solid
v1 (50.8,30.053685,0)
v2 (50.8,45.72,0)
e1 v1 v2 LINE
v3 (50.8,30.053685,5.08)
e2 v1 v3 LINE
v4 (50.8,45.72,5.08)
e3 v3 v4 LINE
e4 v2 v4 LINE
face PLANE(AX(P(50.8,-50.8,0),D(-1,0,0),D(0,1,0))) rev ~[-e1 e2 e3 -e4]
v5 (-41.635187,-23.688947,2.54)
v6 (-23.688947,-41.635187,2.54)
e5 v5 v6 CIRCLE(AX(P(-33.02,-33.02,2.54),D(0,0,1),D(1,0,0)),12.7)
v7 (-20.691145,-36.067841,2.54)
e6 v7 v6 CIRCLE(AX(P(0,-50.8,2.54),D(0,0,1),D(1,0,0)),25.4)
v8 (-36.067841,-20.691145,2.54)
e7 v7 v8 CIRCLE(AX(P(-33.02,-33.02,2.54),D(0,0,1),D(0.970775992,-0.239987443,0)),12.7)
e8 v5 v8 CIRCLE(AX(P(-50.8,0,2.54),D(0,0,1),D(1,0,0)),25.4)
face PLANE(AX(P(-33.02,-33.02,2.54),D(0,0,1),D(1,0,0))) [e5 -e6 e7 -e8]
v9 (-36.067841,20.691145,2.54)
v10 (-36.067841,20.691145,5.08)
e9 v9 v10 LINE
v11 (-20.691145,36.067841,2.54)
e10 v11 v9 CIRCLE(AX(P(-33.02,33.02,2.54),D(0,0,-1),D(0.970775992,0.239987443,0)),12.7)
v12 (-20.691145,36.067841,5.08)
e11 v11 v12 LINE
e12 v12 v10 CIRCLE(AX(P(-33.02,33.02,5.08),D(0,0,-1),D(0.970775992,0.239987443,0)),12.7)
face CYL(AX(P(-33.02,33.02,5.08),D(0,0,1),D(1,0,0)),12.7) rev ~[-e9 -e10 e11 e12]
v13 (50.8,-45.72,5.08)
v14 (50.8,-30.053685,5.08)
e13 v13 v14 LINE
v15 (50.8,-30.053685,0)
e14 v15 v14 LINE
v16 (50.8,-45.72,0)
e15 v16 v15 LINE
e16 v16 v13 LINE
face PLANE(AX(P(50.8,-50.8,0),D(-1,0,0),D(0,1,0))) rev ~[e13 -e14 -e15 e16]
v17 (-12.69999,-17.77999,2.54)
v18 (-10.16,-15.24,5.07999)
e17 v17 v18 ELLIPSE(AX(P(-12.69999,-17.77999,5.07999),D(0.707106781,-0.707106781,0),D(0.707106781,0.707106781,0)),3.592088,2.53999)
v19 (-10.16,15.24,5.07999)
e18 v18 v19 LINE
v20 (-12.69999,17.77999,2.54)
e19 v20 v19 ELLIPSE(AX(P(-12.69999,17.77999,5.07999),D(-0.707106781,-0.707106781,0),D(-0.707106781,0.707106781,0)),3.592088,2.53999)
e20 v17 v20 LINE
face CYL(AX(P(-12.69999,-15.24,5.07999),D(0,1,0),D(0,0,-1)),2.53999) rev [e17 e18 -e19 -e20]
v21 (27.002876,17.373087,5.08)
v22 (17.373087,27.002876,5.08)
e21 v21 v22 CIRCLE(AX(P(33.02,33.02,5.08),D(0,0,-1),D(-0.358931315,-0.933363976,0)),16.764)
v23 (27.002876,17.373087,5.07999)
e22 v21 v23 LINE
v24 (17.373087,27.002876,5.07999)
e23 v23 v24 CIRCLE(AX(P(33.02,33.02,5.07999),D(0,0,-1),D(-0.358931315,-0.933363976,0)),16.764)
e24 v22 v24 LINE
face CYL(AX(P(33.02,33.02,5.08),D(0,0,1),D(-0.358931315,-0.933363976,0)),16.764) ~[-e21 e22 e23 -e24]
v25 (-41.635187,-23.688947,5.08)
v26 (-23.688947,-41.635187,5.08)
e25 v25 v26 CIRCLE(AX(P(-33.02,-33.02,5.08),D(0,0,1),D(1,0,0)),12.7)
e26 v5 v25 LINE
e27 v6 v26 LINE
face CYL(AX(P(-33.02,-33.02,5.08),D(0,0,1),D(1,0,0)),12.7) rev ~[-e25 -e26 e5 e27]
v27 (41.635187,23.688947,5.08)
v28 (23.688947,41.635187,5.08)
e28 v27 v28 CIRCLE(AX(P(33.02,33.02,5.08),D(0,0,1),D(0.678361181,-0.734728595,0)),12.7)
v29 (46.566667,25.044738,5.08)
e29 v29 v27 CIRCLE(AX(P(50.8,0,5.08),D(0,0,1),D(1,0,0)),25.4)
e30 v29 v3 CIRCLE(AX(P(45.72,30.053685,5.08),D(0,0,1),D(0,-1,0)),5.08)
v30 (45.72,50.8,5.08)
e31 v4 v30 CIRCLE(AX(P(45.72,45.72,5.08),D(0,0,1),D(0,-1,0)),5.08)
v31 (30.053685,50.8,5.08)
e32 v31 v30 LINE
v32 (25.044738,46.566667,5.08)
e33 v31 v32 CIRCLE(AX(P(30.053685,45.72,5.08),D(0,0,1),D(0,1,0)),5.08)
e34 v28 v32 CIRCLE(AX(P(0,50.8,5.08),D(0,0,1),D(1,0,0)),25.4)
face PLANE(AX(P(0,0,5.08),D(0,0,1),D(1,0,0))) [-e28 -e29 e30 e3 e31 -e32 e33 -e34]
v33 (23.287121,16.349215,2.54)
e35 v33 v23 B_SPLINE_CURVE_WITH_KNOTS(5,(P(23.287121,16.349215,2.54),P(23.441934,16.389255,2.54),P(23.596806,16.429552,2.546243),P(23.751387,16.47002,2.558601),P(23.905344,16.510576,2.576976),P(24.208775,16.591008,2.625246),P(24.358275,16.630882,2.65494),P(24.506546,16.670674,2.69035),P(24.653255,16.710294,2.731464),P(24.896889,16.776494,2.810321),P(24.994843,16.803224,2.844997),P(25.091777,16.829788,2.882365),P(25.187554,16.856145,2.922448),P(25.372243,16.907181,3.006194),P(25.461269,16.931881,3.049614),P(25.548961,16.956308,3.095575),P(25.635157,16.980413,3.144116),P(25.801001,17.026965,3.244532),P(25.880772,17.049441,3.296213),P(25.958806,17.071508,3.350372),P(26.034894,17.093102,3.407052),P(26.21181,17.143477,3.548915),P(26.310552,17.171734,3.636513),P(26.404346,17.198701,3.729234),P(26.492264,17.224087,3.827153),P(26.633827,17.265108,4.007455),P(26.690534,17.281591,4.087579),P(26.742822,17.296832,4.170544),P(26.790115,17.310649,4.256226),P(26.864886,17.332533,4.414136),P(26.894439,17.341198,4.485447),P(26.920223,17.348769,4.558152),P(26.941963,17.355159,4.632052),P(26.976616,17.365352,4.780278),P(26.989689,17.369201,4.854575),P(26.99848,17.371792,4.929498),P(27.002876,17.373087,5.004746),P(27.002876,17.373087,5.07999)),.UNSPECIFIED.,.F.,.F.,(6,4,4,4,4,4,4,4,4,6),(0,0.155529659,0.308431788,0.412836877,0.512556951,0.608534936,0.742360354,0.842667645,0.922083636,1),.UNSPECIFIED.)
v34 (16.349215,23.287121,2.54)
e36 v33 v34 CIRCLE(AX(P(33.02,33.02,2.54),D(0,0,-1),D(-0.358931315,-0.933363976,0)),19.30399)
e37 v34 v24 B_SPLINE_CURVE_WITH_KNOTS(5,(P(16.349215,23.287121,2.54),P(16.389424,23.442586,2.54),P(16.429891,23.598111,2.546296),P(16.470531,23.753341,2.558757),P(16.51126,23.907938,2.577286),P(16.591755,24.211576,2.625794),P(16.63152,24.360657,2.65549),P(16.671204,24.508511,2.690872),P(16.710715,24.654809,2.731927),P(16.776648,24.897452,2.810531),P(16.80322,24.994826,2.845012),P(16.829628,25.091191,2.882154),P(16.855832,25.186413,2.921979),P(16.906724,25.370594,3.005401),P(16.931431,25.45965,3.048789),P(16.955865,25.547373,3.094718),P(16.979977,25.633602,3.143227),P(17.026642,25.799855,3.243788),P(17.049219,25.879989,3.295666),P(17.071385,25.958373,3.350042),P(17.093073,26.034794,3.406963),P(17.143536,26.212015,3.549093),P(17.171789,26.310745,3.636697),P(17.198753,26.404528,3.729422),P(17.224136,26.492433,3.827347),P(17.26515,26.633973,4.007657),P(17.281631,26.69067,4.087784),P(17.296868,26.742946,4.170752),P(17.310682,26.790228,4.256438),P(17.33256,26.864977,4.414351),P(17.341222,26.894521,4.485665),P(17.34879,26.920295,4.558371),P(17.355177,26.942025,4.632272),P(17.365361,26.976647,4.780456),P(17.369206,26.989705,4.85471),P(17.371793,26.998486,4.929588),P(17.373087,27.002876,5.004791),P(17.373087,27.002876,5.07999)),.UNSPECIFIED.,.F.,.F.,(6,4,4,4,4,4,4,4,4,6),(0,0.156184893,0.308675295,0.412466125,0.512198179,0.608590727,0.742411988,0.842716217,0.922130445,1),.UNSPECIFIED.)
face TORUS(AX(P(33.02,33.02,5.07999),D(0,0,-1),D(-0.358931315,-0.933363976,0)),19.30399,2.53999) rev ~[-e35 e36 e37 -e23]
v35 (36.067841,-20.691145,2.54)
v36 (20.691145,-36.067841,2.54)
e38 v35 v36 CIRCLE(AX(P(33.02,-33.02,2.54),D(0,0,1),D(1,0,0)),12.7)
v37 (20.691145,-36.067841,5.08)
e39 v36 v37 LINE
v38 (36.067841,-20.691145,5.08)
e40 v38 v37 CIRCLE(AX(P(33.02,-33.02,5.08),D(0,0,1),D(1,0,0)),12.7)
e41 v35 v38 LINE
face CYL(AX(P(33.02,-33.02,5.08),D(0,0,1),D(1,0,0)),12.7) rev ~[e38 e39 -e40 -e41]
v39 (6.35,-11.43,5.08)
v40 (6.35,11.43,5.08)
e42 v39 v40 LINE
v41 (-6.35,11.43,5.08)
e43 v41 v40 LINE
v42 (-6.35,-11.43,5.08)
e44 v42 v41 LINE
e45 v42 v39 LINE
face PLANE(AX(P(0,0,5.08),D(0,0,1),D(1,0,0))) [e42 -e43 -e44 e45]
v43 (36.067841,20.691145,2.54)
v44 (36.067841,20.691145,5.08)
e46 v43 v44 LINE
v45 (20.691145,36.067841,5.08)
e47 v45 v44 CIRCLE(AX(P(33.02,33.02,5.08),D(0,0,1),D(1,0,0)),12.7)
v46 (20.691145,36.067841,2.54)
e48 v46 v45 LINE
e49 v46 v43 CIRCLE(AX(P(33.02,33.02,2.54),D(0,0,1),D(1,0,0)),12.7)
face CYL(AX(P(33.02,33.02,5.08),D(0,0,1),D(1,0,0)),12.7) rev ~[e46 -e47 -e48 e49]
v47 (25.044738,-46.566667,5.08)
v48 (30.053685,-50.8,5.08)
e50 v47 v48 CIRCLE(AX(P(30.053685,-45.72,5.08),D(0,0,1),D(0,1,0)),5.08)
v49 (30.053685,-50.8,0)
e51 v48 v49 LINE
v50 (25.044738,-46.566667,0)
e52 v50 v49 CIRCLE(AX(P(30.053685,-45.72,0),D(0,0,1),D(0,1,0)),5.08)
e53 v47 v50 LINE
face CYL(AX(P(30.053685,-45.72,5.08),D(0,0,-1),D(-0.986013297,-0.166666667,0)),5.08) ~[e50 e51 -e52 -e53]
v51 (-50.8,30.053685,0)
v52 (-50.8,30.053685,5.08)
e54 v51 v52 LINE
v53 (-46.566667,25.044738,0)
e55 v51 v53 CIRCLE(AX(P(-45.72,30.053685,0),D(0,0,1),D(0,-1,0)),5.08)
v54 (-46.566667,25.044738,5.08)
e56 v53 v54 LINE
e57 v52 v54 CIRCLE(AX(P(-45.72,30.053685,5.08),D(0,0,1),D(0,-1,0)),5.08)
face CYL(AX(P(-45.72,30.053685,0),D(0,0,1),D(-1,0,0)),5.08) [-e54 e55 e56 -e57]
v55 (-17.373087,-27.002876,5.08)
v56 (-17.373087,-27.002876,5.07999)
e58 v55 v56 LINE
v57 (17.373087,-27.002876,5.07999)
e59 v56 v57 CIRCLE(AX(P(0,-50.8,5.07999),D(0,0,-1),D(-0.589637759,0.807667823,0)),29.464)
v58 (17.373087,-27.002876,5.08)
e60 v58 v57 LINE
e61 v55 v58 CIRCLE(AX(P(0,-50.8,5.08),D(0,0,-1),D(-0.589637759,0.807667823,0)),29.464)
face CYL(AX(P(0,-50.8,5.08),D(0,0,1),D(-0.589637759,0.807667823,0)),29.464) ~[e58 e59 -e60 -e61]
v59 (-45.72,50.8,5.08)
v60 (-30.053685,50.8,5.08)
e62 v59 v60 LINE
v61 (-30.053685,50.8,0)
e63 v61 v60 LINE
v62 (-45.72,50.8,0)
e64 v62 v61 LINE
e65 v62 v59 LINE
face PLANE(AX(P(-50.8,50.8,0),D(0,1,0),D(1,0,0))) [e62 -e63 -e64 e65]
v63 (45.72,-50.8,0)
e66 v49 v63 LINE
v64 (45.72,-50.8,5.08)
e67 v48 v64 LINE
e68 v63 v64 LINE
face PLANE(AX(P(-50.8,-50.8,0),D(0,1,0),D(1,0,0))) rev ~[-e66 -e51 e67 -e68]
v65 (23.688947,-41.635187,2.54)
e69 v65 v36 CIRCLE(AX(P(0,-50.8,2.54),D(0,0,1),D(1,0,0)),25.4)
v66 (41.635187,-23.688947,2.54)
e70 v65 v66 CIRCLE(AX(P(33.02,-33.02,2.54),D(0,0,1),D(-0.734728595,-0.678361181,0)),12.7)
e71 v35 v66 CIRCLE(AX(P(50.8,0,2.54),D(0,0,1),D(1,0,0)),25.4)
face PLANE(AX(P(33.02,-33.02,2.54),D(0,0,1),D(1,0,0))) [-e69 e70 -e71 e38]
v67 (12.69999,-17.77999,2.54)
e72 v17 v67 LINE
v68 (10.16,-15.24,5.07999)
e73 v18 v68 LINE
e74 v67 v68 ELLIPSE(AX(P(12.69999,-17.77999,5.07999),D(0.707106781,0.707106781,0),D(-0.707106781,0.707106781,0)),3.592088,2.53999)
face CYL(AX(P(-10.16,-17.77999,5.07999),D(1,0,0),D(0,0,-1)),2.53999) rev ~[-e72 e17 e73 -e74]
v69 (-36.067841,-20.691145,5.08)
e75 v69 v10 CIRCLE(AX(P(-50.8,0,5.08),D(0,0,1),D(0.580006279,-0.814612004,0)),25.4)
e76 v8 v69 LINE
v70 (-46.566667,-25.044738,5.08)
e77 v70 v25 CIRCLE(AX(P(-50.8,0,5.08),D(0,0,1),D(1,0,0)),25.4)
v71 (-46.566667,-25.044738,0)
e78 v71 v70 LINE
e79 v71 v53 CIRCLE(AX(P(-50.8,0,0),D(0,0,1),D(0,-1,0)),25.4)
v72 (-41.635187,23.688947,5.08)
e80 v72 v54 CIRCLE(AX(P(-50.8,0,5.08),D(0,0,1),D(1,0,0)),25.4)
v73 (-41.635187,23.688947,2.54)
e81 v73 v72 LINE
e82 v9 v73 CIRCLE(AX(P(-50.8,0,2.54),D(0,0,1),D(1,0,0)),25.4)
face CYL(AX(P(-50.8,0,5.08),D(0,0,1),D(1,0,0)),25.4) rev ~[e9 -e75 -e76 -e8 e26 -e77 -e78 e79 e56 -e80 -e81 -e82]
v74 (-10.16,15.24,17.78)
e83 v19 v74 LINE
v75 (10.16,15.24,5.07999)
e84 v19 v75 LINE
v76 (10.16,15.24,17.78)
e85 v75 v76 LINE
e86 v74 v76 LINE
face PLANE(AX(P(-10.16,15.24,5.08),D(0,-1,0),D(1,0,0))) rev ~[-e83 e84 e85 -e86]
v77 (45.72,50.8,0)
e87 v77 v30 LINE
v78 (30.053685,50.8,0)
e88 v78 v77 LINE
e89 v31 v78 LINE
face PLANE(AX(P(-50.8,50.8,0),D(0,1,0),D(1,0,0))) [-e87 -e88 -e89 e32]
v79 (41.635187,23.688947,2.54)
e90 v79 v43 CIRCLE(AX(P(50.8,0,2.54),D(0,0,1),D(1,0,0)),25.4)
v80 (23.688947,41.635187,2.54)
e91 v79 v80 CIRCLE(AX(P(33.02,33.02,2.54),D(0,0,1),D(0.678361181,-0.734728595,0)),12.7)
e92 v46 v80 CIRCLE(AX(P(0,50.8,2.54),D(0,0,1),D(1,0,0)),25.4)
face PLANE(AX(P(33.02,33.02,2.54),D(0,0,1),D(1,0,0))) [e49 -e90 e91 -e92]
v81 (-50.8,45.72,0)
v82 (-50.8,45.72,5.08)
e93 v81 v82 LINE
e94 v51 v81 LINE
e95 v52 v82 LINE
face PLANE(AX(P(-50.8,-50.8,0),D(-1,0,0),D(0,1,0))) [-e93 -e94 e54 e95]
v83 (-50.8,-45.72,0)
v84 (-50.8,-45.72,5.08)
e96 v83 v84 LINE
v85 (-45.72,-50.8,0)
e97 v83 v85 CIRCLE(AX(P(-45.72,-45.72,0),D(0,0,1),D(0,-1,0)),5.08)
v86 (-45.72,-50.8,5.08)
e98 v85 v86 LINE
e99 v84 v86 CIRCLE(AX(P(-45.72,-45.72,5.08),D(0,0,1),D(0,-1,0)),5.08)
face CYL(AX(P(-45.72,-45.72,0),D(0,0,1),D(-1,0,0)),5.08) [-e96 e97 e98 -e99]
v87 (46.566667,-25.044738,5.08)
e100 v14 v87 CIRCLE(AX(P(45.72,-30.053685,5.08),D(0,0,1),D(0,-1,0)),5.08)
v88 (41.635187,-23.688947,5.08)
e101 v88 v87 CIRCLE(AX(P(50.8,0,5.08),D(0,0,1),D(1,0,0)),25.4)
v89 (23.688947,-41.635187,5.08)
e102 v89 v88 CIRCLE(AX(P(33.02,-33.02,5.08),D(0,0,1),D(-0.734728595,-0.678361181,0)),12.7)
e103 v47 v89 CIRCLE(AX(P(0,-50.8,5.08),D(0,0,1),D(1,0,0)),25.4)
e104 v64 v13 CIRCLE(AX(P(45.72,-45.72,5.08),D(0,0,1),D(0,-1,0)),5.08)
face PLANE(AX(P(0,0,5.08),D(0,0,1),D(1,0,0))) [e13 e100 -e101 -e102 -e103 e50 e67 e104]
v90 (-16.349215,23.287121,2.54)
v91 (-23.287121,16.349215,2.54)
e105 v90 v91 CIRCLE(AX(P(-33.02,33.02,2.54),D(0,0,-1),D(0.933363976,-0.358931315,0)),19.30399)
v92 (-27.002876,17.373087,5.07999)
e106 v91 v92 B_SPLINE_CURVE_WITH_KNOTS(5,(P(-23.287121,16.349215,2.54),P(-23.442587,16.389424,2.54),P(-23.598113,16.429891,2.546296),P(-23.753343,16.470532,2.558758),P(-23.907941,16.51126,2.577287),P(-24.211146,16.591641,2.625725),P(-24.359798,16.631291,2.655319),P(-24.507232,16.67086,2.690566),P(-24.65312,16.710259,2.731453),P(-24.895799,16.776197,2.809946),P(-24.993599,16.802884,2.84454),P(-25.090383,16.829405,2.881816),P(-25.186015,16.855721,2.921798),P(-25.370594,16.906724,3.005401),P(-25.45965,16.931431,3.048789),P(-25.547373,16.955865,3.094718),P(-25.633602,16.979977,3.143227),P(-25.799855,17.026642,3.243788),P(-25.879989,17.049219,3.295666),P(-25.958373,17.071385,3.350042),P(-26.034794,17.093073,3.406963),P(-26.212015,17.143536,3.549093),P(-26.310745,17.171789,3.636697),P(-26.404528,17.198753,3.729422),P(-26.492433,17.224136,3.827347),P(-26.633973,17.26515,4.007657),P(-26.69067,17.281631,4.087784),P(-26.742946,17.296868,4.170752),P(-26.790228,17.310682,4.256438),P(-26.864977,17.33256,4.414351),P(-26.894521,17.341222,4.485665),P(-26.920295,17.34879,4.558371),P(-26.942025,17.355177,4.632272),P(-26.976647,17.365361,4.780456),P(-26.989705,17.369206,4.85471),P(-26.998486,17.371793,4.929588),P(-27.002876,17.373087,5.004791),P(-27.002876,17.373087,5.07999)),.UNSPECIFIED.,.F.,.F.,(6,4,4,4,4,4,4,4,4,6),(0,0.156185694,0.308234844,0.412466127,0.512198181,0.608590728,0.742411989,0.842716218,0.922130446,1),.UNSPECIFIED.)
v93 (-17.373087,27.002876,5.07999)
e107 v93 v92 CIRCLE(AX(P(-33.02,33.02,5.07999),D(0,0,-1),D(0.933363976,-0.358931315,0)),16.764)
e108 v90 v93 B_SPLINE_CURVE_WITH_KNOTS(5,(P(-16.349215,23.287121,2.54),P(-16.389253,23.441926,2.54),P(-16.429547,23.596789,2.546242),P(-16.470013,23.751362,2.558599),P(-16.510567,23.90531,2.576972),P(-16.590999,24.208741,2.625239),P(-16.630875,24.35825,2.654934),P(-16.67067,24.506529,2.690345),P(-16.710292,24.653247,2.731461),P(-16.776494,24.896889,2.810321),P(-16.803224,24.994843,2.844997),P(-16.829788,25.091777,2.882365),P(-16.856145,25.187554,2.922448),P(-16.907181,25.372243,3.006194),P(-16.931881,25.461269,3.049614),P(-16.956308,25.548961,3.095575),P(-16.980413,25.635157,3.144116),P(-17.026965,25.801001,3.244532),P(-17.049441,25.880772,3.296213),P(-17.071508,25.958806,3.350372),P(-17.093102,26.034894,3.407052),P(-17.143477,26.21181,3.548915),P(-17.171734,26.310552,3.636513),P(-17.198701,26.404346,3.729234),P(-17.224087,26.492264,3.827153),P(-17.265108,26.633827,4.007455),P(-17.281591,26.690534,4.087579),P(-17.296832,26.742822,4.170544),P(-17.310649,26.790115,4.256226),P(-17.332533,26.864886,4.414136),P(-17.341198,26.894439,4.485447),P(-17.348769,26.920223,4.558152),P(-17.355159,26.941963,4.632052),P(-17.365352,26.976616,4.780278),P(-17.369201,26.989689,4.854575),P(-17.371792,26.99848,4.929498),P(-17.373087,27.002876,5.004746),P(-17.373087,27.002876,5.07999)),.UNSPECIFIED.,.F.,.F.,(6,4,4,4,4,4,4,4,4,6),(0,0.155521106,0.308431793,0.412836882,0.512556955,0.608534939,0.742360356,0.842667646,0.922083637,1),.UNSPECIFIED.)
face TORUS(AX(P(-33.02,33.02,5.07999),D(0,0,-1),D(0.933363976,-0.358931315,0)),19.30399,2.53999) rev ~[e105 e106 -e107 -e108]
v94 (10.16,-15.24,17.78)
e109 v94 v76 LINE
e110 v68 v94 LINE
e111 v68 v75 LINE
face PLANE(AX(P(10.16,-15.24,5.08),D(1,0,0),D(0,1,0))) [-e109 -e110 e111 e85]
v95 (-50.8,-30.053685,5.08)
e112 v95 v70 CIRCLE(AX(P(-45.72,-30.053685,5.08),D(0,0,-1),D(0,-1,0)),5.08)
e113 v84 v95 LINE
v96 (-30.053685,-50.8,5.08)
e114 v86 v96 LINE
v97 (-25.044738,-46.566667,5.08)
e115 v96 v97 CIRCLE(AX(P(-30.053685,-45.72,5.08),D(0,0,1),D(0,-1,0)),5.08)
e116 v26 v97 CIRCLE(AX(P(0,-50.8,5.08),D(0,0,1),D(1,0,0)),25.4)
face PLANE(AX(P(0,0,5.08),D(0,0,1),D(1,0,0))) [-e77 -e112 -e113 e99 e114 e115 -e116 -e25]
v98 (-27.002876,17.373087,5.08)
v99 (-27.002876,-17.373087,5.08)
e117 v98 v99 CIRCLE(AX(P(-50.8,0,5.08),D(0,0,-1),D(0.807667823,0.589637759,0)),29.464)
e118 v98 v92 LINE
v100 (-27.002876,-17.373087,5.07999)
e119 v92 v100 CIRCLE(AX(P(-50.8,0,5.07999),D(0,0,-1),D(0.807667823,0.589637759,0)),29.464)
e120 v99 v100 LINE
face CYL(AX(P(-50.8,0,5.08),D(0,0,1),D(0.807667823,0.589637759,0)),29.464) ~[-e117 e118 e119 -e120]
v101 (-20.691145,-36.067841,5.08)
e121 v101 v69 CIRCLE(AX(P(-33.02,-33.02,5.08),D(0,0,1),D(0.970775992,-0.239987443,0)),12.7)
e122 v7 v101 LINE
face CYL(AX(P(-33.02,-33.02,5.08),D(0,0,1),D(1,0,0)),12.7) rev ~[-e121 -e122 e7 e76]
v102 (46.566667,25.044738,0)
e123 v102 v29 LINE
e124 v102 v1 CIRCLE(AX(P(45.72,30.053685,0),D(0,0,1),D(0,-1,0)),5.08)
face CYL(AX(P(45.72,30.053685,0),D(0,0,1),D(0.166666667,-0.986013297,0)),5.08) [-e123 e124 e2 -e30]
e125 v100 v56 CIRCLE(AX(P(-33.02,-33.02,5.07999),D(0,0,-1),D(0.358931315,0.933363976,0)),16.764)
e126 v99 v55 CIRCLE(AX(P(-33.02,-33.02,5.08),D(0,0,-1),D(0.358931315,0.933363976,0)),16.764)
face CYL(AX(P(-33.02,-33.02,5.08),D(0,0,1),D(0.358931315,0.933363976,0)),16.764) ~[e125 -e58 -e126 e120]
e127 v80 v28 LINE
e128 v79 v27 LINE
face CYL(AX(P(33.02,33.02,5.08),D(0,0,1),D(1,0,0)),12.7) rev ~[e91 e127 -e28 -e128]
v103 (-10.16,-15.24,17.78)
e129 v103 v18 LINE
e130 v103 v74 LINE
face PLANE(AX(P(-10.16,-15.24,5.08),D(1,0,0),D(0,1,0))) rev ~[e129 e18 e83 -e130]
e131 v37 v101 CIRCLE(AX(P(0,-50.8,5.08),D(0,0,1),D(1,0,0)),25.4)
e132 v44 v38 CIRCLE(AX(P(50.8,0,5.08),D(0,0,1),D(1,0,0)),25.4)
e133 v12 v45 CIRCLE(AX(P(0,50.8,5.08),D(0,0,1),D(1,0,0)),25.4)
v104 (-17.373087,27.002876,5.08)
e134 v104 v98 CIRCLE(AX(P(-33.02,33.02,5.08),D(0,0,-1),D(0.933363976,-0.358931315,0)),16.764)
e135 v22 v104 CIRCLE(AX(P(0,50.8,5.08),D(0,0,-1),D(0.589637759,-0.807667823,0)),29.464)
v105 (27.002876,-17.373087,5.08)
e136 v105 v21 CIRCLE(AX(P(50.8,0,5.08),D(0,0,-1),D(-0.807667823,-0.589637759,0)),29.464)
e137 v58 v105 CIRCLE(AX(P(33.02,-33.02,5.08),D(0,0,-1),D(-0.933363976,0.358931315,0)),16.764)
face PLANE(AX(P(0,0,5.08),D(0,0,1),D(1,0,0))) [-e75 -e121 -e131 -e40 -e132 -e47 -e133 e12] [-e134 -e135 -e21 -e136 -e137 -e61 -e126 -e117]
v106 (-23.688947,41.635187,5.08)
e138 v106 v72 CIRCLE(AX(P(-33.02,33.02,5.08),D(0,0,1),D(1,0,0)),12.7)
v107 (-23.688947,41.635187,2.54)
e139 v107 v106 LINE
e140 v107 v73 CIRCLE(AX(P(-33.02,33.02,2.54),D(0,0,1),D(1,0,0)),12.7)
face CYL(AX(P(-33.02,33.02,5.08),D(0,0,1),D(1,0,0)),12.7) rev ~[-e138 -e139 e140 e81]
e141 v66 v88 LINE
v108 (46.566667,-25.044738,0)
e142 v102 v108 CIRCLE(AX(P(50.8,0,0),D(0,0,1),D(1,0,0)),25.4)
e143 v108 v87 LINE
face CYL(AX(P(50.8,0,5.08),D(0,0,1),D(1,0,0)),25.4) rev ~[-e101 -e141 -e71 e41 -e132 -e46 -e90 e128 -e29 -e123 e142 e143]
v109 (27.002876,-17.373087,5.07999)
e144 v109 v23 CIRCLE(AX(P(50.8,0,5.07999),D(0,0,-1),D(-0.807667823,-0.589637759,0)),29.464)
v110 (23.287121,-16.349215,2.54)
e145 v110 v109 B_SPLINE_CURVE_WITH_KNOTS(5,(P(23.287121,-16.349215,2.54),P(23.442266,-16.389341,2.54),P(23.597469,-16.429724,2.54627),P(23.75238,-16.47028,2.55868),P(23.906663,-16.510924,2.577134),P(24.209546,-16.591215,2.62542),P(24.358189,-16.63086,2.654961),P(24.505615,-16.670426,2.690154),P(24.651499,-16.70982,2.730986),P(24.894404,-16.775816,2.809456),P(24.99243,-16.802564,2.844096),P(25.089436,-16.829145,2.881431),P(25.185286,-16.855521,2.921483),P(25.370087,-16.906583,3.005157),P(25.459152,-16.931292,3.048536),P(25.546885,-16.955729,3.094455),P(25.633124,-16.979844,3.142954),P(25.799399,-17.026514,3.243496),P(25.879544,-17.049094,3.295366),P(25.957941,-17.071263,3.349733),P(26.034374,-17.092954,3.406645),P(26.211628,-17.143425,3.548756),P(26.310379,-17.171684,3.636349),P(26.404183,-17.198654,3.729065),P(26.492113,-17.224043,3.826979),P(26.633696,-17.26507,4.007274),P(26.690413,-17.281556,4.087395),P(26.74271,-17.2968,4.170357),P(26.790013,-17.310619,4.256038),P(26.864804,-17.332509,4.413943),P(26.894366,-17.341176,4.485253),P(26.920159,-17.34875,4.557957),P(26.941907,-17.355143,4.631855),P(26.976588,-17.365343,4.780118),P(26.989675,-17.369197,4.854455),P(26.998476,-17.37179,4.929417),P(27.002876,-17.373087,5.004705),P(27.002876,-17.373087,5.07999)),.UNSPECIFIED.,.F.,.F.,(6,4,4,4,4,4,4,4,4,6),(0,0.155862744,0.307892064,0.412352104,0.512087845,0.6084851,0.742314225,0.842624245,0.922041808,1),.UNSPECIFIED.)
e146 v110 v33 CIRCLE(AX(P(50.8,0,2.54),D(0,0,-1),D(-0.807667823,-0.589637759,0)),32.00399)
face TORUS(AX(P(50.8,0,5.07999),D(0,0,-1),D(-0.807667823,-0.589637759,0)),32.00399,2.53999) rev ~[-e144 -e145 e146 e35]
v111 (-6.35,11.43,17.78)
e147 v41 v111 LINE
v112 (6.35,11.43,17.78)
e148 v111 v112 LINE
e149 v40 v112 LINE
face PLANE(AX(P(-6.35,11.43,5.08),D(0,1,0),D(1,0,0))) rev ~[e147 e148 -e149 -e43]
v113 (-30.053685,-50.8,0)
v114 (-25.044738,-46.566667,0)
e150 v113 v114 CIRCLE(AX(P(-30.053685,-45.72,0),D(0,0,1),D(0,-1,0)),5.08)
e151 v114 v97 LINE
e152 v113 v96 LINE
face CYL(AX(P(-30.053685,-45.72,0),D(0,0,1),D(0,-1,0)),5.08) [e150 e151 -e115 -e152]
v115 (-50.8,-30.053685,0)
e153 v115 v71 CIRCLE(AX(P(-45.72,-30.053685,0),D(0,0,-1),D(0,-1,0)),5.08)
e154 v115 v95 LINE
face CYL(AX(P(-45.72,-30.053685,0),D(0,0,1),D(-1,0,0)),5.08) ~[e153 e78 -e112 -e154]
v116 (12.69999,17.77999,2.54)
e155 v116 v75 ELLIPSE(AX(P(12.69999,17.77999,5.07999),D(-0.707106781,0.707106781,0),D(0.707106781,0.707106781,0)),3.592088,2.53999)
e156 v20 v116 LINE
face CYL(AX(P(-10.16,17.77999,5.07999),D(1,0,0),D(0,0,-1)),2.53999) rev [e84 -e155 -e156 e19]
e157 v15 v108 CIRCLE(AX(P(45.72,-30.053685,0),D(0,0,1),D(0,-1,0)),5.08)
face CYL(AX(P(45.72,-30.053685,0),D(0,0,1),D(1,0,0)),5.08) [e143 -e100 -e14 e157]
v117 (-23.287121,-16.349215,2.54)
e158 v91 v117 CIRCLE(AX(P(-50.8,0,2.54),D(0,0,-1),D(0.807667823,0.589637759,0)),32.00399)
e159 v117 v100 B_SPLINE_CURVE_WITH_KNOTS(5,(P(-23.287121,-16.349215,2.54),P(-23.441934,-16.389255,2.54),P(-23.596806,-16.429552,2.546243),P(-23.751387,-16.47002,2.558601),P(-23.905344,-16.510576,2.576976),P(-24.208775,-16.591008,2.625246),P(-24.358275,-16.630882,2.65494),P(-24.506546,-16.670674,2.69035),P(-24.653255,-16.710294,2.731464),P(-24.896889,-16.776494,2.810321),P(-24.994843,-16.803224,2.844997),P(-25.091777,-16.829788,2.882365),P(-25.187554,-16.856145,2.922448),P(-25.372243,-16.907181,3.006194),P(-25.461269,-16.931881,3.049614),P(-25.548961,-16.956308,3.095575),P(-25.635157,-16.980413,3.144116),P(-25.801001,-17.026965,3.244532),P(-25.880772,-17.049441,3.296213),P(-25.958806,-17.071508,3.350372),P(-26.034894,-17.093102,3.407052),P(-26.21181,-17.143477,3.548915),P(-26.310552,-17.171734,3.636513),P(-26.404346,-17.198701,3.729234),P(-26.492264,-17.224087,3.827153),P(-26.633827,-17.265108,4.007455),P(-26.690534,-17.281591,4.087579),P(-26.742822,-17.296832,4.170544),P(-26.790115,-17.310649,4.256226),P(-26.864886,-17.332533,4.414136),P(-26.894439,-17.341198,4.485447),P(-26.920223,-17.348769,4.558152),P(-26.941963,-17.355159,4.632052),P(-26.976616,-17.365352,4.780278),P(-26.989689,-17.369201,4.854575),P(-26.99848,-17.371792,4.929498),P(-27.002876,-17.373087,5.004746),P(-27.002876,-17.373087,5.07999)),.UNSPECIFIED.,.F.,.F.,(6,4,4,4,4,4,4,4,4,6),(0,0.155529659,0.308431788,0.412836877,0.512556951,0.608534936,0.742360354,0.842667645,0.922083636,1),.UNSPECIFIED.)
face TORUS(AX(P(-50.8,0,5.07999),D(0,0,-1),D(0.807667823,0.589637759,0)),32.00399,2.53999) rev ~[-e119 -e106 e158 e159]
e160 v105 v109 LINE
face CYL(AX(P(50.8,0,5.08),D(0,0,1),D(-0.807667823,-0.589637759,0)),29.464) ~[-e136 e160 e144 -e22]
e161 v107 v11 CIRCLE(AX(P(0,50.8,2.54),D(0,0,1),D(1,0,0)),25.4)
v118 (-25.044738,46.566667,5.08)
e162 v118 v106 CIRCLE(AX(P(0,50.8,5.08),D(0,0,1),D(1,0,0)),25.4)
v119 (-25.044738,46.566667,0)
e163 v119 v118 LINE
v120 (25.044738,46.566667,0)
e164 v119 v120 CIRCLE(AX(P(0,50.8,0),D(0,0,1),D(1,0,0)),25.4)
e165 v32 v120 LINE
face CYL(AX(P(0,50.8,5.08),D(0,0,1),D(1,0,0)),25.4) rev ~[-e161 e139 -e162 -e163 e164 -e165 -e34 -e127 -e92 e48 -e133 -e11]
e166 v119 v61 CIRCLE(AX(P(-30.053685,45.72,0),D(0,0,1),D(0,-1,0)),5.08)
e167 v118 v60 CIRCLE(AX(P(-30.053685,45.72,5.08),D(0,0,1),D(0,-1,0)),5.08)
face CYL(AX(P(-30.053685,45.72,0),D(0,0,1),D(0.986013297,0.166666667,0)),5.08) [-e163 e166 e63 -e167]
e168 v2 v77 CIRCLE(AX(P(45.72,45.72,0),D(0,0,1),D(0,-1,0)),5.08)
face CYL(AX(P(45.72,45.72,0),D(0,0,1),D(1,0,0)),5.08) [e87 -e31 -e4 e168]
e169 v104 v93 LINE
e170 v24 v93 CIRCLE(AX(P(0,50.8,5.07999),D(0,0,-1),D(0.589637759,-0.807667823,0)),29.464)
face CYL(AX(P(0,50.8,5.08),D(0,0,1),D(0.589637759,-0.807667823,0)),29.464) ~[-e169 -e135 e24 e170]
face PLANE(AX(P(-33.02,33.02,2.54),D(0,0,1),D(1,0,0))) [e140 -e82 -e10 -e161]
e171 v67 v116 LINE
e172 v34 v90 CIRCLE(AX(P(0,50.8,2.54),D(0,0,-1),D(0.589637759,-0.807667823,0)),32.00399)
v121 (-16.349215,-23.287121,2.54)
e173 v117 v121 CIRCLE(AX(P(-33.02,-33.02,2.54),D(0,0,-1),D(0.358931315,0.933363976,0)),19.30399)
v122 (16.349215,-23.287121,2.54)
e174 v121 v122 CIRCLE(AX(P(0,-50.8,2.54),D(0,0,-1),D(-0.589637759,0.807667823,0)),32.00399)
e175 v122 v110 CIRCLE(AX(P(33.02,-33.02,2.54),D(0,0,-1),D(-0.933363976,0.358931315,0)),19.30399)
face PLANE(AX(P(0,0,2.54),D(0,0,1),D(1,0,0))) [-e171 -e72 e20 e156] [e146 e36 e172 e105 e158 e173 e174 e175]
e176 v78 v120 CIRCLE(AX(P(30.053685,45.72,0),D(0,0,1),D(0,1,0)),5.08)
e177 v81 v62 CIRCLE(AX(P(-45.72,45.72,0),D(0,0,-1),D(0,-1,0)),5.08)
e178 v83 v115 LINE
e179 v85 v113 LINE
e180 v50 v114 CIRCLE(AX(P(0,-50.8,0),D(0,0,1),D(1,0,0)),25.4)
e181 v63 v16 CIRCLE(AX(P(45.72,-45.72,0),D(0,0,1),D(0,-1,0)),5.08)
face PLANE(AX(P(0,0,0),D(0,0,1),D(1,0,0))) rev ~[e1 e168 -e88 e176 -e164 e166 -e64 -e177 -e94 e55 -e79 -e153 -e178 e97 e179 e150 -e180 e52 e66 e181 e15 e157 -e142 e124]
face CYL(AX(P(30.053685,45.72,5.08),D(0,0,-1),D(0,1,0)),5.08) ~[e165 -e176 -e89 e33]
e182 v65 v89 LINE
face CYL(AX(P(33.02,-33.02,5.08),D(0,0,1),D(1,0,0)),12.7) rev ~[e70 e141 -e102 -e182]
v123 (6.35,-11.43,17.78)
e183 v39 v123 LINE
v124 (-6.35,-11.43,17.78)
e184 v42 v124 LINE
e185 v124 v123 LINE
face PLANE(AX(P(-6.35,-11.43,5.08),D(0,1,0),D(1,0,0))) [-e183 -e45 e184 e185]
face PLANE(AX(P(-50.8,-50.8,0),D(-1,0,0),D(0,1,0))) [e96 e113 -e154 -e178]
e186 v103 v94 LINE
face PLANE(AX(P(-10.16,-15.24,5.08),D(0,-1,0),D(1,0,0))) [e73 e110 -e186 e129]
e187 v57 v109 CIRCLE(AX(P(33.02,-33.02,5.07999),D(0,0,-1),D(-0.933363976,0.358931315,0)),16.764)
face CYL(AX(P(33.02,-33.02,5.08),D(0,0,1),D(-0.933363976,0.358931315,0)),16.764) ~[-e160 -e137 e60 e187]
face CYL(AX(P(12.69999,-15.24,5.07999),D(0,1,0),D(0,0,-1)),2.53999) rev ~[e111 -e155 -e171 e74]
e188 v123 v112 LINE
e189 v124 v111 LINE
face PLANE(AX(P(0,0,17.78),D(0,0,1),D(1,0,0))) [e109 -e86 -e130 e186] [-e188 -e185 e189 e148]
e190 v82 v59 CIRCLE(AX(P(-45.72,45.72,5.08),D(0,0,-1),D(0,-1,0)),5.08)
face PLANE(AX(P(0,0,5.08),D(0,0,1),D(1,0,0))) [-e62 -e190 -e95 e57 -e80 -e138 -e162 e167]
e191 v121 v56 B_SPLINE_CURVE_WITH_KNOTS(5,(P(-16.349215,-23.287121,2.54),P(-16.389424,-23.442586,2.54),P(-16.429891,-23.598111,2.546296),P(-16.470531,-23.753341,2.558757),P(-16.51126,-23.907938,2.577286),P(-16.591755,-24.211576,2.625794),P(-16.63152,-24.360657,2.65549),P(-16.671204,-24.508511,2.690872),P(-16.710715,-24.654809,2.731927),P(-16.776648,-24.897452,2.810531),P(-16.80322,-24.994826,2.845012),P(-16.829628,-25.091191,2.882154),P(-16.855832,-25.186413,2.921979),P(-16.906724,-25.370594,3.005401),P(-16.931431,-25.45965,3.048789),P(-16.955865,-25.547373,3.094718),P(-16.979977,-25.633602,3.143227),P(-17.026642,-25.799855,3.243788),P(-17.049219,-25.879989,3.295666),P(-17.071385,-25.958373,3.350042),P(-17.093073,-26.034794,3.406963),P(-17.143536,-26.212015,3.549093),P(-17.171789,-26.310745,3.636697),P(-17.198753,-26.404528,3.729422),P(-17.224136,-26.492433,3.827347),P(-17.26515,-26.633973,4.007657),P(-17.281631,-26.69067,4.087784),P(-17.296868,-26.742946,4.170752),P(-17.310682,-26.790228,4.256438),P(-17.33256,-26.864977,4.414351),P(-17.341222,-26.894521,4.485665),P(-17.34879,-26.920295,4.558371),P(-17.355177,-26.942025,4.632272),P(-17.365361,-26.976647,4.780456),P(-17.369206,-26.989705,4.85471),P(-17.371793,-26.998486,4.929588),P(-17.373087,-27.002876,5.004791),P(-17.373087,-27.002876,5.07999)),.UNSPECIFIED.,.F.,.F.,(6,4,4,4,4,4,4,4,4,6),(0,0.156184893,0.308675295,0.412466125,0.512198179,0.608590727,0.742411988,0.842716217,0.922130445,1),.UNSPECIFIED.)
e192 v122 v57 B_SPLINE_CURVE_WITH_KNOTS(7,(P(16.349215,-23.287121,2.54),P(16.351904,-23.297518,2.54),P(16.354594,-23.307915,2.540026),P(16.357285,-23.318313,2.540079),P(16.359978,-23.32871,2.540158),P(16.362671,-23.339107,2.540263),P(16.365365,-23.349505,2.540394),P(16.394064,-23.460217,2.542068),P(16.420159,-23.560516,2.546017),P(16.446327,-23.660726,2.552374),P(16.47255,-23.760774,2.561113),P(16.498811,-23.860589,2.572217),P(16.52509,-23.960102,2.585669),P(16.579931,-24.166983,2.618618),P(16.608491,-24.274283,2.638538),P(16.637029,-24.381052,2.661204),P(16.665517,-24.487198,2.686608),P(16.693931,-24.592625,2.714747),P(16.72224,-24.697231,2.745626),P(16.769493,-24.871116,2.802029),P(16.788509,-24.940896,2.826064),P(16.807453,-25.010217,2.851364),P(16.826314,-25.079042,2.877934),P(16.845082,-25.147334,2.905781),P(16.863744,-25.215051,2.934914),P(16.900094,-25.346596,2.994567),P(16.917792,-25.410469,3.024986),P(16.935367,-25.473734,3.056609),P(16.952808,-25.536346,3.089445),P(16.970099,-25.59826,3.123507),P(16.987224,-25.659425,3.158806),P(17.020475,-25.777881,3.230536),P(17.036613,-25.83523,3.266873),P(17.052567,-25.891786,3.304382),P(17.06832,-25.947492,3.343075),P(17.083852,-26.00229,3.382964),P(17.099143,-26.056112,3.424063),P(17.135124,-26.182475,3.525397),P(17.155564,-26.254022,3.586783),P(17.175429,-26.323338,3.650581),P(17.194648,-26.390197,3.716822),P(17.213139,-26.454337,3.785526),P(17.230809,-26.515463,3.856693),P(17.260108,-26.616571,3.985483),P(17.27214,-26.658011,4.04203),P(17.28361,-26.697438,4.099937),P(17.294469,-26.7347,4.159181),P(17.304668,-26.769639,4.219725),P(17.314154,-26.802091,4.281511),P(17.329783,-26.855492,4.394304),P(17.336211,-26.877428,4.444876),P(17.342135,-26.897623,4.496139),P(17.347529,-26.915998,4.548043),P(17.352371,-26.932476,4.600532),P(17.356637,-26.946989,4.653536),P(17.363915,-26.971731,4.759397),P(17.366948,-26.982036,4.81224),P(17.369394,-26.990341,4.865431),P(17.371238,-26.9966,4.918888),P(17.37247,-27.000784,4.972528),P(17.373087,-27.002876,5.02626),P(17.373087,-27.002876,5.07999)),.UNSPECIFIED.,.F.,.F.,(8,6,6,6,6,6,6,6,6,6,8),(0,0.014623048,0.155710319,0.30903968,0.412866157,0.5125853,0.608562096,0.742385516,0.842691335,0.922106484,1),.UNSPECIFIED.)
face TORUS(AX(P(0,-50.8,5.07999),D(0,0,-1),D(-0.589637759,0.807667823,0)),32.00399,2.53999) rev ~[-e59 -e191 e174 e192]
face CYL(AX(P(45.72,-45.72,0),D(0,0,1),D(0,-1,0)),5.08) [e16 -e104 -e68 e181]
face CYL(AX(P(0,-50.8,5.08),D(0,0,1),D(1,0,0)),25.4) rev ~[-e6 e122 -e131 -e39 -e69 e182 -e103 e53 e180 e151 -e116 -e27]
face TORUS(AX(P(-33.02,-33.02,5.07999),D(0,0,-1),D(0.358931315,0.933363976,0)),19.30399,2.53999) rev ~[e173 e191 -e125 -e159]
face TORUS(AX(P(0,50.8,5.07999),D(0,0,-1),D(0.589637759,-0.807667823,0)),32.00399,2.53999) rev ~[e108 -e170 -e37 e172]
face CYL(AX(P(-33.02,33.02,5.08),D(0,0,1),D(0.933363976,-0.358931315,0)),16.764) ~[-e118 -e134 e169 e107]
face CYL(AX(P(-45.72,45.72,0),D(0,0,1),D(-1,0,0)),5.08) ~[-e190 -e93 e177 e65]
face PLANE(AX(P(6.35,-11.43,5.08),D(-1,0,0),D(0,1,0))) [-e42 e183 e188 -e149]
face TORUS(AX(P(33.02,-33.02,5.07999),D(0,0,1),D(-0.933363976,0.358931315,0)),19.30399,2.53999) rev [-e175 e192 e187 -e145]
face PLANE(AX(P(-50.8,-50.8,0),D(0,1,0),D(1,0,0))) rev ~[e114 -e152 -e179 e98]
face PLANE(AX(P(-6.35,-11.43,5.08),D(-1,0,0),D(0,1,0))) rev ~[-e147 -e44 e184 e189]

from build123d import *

# Parameters (mm, degrees)
F0_W      = 101.6
F0_H      = 101.6
F1_DEPTH  = 5.08
F2_R      = 12.7
F3_DEPTH  = 2.54
F4_W      = 20.32
F4_H      = 30.48
F4_W_2    = 12.7
F4_H_2    = 22.86
F5_DEPTH  = 12.7
F6_R      = 25.4
F7_DEPTH  = 25.4
F8_R      = 5.08
F9_W      = 20.32
F9_H      = 30.48
F10_DEPTH = 2.54
F11_R     = 2.53999


# Not quite as in the source:
# - a fillet or chamfer is up to 0.001 mm smaller than in the source, because OpenCascade refuses the exact size


with BuildPart() as f1:
    # F0 (on Top) → F1 (new body)
    with BuildSketch(Plane.XY):
        Rectangle(F0_W, F0_H)
    extrude(amount=F1_DEPTH)

    # F2 (on face) → F3 (cut)
    with BuildSketch(Plane.XY.offset(5.08)):
        with Locations((-33.02, 33.02)):
            Circle(F2_R)
        with Locations((33.02, 33.02)):
            Circle(F2_R)
        with Locations((33.02, -33.02)):
            Circle(F2_R)
        with Locations((-33.02, -33.02)):
            Circle(F2_R)
    extrude(amount=-F3_DEPTH, mode=Mode.SUBTRACT)

    # F4 (on face) → F5 (join)
    with BuildSketch(Plane.XY.offset(5.08)):
        Rectangle(F4_W, F4_H)
        Rectangle(F4_W_2, F4_H_2, mode=Mode.SUBTRACT)
    extrude(amount=F5_DEPTH)

    # F6 (on face) → F7 (cut)
    with BuildSketch(Plane.XY.offset(5.08)):
        with Locations((-50.8, 0)):
            Circle(F6_R)
        with Locations((50.8, 0)):
            Circle(F6_R)
        with Locations((0, 50.8)):
            Circle(F6_R)
        with Locations((0, -50.8)):
            Circle(F6_R)
    extrude(amount=-F7_DEPTH, mode=Mode.SUBTRACT)

    # F8
    f8_edges = [f1.edges().sort_by_distance(p)[0] for p in [
        (-50.8, -25.4, 2.54),
        (-50.8, 25.4, 2.54),
        (-50.8, -50.8, 2.54),
        (25.4, -50.8, 2.54),
        (-25.4, -50.8, 2.54),
        (50.8, -50.8, 2.54),
        (50.8, -25.4, 2.54),
        (50.8, 25.4, 2.54),
        (50.8, 50.8, 2.54),
        (-25.4, 50.8, 2.54),
        (25.4, 50.8, 2.54),
        (-50.8, 50.8, 2.54),
    ]]
    fillet(f8_edges, radius=F8_R)

    # F9 (on face) → F10 (cut)
    with BuildSketch(Plane.XY.offset(5.08)):
        with BuildLine():
            ThreePointArc((27.0028755866, -17.3730866956), (21.3360004127, 0), (27.0028755866, 17.3730866956))
            ThreePointArc((27.0028755866, 17.3730866956), (21.166062212, 21.166062212), (17.3730866956, 27.0028755866))
            ThreePointArc((17.3730866956, 27.0028755866), (0, 21.3360004127), (-17.3730866956, 27.0028755866))
            ThreePointArc((-17.3730866956, 27.0028755866), (-21.166062212, 21.166062212), (-27.0028755866, 17.3730866956))
            ThreePointArc((-27.0028755866, 17.3730866956), (-21.3360004127, 0), (-27.0028755866, -17.3730866956))
            ThreePointArc((-27.0028755866, -17.3730866956), (-21.166062212, -21.166062212), (-17.3730866956, -27.0028755866))
            ThreePointArc((-17.3730866956, -27.0028755866), (0, -21.3360004127), (17.3730866956, -27.0028755866))
            ThreePointArc((17.3730866956, -27.0028755866), (21.166062212, -21.166062212), (27.0028755866, -17.3730866956))
        make_face()
        Rectangle(F9_W, F9_H, mode=Mode.SUBTRACT)
    extrude(amount=-F10_DEPTH, mode=Mode.SUBTRACT)

    # F11 (radius 2.54 in the source; OpenCascade refuses exactly that, so slightly less here)
    f11_edges = [f1.edges().sort_by_distance(p)[0] for p in [
        (21.336, 0, 2.54),
        (21.166062, 21.166062, 2.54),
        (0, 21.336, 2.54),
        (-21.166062, 21.166062, 2.54),
        (-21.336, 0, 2.54),
        (-21.166062, -21.166062, 2.54),
        (0, -21.336, 2.54),
        (21.166062, -21.166062, 2.54),
        (-10.16, 0, 2.54),
        (0, 15.24, 2.54),
        (10.16, 0, 2.54),
        (0, -15.24, 2.54),
    ]]
    fillet(f11_edges, radius=F11_R)


solid = f1.part
